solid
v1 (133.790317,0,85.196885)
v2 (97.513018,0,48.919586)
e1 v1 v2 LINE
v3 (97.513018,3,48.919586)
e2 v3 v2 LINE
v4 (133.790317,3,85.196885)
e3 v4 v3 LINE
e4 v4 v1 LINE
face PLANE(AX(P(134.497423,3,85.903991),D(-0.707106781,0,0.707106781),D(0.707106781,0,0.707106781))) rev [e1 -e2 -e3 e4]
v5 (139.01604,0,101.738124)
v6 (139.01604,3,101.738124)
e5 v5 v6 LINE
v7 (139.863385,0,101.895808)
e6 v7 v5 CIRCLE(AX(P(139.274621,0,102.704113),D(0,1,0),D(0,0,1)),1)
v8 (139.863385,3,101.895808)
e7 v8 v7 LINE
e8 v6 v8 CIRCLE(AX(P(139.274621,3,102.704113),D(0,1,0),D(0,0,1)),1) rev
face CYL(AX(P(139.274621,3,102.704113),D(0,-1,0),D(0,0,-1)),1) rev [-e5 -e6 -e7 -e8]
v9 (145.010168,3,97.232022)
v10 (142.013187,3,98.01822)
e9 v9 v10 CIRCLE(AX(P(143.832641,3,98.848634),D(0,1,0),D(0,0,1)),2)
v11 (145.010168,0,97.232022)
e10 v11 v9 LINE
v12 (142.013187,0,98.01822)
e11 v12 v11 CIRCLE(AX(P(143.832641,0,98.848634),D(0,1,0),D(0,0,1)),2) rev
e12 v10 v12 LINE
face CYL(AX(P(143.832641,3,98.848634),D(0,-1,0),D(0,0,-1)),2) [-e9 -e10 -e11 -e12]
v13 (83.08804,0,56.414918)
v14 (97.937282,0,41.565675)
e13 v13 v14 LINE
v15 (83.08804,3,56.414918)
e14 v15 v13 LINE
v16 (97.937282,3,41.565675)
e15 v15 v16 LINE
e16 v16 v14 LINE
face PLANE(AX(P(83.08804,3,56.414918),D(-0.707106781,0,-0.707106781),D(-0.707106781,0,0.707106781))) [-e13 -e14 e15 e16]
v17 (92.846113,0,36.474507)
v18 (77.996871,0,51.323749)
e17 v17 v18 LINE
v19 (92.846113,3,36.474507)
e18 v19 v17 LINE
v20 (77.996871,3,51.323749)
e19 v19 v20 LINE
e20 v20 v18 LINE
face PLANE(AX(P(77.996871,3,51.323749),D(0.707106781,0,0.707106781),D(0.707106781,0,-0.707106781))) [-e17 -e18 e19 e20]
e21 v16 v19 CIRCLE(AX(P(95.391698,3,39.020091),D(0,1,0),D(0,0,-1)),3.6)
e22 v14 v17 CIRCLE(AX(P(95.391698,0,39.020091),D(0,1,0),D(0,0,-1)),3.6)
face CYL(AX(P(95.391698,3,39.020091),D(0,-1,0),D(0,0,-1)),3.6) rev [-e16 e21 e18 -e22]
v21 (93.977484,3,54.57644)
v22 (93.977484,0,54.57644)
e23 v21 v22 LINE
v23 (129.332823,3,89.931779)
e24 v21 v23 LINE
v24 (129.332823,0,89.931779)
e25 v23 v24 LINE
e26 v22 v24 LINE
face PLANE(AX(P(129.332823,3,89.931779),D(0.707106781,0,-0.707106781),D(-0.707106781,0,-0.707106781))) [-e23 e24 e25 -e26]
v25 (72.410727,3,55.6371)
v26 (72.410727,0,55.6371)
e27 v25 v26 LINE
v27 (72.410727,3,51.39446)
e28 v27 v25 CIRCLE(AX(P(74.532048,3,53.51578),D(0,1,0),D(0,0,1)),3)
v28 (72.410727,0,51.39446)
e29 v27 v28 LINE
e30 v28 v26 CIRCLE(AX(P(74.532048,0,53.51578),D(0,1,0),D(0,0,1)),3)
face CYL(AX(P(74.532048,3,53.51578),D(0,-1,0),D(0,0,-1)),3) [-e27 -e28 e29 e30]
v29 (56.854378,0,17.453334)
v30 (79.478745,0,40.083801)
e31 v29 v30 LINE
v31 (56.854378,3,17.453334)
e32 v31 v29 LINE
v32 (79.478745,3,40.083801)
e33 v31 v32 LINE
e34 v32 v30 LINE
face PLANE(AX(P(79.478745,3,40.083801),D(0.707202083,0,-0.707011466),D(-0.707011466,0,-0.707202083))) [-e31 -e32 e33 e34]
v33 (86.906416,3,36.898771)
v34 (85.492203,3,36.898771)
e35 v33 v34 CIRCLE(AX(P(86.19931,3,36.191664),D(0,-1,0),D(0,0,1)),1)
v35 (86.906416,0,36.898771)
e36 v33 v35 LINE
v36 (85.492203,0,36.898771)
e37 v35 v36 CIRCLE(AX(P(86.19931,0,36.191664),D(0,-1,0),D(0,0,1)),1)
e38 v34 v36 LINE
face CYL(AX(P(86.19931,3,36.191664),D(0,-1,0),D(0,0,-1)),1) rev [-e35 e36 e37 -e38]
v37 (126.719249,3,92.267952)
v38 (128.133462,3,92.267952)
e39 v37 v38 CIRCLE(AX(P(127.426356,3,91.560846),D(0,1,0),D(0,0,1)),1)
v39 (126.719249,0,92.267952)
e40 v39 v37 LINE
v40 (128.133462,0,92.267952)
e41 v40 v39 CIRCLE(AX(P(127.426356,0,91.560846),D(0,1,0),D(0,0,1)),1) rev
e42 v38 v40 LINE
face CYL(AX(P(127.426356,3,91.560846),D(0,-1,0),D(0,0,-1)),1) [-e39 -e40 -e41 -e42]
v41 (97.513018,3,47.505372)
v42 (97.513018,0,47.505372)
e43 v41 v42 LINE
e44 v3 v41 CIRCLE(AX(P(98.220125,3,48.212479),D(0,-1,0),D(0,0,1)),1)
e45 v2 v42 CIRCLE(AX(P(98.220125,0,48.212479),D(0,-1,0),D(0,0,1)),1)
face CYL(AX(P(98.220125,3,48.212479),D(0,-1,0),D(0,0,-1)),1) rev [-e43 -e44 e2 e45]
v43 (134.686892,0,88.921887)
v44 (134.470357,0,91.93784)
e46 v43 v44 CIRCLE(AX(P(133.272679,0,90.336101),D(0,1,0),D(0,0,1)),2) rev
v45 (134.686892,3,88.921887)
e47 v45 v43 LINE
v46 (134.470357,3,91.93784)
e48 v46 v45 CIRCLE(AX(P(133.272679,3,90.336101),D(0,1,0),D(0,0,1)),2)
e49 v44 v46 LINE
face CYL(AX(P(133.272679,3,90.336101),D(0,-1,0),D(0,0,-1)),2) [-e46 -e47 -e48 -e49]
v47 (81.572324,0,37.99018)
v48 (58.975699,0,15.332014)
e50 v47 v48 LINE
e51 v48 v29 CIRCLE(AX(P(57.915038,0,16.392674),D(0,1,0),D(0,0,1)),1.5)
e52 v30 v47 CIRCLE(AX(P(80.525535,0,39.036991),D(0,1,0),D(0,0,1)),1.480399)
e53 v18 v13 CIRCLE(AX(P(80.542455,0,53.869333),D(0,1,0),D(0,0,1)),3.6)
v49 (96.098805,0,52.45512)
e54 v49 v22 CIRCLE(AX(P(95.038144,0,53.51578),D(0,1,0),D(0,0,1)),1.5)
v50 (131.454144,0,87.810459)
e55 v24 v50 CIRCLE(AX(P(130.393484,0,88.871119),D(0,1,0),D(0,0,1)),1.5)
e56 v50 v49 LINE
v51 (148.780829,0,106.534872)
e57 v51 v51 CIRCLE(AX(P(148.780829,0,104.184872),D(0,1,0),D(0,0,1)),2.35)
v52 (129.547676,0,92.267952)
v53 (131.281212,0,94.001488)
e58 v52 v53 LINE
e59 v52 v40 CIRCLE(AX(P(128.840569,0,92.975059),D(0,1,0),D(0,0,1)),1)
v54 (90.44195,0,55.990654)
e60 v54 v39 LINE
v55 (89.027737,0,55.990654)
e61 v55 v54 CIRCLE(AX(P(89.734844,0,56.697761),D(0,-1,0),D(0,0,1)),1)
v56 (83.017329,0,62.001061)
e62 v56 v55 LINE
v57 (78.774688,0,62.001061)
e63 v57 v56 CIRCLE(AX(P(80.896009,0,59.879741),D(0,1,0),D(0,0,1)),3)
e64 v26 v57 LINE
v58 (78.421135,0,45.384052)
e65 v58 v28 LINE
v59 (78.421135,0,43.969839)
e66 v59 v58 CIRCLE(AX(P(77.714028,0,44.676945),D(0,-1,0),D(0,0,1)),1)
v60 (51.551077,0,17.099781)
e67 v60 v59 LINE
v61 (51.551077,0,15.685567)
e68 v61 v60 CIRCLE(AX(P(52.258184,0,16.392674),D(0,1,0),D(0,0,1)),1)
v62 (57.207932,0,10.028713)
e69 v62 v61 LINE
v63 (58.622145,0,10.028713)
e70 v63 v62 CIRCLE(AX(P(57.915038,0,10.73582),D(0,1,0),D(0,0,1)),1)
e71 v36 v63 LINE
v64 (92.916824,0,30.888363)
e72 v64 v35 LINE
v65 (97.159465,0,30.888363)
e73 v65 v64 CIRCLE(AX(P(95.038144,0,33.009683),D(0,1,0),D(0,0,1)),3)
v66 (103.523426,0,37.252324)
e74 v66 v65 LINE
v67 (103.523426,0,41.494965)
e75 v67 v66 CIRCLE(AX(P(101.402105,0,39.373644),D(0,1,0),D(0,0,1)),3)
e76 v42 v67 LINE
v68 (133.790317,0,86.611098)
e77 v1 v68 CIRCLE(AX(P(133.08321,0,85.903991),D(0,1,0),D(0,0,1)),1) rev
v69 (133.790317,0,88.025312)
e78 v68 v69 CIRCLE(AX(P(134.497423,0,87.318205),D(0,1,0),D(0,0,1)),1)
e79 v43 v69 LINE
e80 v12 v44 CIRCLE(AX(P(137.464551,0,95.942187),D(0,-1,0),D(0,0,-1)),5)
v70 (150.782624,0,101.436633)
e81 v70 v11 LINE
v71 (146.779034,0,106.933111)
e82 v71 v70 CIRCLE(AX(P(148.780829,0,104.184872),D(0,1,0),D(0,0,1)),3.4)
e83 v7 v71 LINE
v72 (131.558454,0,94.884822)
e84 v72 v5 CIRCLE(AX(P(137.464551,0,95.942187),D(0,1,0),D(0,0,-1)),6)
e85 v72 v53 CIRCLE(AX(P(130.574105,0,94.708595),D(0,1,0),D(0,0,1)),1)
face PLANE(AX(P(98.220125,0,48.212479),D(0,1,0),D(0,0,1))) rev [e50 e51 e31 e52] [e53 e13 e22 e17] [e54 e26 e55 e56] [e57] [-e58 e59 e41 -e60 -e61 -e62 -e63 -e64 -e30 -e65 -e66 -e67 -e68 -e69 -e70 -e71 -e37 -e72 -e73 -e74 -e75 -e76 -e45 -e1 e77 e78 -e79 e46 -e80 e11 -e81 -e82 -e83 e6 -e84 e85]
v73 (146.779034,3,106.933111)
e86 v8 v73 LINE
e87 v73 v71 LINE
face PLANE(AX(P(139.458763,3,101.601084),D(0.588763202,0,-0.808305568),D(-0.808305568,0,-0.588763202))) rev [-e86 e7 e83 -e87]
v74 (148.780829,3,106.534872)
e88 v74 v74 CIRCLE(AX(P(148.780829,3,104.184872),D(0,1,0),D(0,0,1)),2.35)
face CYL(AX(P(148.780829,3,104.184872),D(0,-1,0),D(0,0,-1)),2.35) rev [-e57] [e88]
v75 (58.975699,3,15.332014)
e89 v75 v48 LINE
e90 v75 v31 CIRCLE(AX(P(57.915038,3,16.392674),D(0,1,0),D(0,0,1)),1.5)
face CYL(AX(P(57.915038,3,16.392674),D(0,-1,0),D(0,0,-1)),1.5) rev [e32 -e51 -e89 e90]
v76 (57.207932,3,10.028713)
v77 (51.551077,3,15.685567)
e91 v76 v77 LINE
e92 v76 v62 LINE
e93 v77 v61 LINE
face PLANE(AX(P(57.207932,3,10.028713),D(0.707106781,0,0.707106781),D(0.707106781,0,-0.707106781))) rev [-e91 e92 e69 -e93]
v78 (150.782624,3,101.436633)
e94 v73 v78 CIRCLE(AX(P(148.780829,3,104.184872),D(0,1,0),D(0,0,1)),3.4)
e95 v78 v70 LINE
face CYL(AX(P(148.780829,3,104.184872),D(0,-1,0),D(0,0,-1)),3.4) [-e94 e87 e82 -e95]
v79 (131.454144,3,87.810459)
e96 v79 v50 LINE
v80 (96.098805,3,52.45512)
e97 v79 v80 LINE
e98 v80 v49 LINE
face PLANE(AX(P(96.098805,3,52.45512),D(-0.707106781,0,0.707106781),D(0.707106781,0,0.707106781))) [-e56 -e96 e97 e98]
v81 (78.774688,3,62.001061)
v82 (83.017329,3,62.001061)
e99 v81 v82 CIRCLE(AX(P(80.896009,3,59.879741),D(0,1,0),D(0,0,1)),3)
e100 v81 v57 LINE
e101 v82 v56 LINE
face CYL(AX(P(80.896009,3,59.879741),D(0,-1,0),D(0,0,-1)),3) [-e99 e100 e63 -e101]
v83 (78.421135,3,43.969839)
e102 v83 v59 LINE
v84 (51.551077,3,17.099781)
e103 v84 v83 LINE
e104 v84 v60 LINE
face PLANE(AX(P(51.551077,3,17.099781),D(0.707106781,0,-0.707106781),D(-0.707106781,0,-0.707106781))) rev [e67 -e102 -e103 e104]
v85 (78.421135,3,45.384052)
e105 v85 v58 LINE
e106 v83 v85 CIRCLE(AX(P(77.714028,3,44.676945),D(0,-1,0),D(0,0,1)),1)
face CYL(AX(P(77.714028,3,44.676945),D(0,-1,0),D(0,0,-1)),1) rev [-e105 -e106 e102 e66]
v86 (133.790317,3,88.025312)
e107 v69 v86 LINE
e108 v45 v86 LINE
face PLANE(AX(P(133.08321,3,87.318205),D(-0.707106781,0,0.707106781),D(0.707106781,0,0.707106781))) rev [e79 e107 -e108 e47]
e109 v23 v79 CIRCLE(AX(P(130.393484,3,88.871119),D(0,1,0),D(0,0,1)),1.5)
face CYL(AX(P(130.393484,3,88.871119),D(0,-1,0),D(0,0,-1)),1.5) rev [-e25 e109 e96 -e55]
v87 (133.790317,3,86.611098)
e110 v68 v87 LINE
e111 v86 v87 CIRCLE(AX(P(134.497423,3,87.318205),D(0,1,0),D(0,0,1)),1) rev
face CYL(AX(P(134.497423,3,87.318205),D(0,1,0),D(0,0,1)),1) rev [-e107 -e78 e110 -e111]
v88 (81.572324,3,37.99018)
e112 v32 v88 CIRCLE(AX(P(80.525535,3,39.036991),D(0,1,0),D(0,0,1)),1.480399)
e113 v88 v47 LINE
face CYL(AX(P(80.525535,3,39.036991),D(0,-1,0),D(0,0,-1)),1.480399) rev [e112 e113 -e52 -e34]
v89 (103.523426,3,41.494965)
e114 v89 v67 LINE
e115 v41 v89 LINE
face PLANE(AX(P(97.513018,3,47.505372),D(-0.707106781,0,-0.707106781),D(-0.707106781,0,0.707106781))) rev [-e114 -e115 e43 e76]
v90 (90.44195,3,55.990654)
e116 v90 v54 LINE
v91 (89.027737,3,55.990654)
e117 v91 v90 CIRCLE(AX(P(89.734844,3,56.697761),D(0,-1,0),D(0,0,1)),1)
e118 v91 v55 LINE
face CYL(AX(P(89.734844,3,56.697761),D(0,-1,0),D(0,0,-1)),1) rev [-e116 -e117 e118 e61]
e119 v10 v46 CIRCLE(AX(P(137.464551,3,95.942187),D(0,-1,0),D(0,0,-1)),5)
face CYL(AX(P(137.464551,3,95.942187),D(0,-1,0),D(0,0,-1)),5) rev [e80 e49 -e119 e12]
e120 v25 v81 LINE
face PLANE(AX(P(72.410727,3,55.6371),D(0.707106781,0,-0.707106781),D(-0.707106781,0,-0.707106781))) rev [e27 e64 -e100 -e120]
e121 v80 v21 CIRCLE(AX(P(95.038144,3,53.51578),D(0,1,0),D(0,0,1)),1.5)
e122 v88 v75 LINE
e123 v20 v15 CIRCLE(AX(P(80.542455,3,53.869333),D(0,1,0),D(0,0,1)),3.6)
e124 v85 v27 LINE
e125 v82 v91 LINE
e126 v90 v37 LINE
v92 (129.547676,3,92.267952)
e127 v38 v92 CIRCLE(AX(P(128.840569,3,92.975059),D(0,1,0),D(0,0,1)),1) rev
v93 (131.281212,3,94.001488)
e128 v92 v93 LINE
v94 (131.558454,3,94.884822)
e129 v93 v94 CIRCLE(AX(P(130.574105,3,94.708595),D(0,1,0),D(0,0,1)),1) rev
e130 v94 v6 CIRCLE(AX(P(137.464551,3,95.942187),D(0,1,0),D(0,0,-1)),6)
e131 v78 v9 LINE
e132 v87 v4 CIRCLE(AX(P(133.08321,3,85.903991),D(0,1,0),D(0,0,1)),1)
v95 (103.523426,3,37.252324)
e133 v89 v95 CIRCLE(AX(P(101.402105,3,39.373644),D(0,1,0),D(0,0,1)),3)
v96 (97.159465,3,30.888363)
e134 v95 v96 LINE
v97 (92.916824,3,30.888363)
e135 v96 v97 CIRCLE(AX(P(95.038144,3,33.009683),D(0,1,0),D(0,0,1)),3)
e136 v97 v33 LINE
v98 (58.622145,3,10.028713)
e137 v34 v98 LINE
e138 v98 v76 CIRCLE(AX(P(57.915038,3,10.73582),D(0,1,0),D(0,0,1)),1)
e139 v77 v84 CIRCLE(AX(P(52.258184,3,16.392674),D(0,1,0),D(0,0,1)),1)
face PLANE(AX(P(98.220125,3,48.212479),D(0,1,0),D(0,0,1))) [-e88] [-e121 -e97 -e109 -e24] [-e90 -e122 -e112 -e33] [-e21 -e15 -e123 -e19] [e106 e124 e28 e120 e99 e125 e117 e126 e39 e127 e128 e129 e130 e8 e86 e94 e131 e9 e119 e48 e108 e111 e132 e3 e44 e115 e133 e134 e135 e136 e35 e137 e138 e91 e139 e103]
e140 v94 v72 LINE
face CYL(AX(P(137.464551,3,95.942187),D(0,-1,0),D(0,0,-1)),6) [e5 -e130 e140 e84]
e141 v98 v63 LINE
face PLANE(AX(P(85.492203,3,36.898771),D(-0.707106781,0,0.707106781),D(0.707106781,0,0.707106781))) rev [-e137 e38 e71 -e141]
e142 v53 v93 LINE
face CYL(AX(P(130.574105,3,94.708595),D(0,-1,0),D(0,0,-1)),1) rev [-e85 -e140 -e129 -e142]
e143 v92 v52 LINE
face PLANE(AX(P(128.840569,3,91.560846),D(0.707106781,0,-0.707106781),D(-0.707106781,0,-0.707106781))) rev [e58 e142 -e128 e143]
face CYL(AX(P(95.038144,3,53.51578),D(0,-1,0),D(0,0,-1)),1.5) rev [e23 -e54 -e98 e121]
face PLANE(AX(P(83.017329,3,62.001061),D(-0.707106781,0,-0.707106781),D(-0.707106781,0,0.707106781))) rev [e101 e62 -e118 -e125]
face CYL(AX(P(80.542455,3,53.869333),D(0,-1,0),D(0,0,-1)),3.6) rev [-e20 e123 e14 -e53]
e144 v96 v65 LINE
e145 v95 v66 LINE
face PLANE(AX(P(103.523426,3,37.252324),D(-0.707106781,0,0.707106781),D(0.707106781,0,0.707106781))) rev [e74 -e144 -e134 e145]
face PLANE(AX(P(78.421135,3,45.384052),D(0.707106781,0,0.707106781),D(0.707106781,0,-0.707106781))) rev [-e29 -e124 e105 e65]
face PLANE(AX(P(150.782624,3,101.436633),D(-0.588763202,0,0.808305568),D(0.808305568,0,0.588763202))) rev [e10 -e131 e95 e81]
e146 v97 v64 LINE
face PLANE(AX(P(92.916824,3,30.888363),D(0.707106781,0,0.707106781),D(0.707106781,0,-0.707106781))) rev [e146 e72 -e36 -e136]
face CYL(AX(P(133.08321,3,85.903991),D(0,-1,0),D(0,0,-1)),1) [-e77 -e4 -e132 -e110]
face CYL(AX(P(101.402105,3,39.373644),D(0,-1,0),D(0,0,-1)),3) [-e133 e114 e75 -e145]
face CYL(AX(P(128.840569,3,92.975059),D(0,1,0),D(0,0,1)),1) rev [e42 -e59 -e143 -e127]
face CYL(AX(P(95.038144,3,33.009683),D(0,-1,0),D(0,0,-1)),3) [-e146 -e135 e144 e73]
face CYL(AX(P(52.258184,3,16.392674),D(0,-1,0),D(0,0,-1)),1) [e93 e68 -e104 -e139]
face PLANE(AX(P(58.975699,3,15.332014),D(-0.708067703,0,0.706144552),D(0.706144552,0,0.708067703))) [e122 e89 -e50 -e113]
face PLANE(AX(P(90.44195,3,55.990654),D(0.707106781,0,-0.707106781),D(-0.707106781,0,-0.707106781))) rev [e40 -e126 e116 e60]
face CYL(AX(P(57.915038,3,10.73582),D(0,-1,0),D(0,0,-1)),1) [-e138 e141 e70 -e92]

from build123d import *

# Parameters (mm, degrees)
SKETCH1_R           = 2.35
BOSS_EXTRUDE1_DEPTH = 3
FILLET1_R           = 1
FILLET2_R           = 2


with BuildPart() as part:
    # Sketch1 → Boss-Extrude1 (new body)
    with BuildSketch(Plane(origin=(0, 0, 0), x_dir=(1, 0, 0), z_dir=(0, 1, 0))):
        with BuildLine():
            Line((150.782624159, -101.436632834), (142.429643363, -95.352389557))
            ThreePointArc((142.429643363, -95.352389557), (134.417437791, -99.906414375), (136.757444533, -90.99243947))
            Line((136.757444533, -90.99243947), (133.083209919, -87.318204856))
            Line((133.083209919, -87.318204856), (134.497423481, -85.903991293))
            Line((134.497423481, -85.903991293), (97.513018177, -48.919585989))
            ThreePointArc((97.513018177, -48.919585989), (97.220124958, -48.212479208), (97.513018177, -47.505372427))
            Line((97.513018177, -47.505372427), (103.523425817, -41.494964787))
            ThreePointArc((103.523425817, -41.494964787), (104.402105474, -39.373644443), (103.523425817, -37.2523241))
            Line((103.523425817, -37.2523241), (97.159464787, -30.888363069))
            ThreePointArc((97.159464787, -30.888363069), (95.038144443, -30.009683412), (92.9168241, -30.888363069))
            Line((92.9168241, -30.888363069), (86.906416459, -36.898770709))
            ThreePointArc((86.906416459, -36.898770709), (86.199309678, -37.191663928), (85.492202897, -36.898770709))
            Line((85.492202897, -36.898770709), (58.622145212, -10.028713024))
            ThreePointArc((58.622145212, -10.028713024), (57.915038431, -9.735819805), (57.20793165, -10.028713024))
            Line((57.20793165, -10.028713024), (51.5510774, -15.685567273))
            ThreePointArc((51.5510774, -15.685567273), (51.258184181, -16.392674055), (51.5510774, -17.099780836))
            Line((51.5510774, -17.099780836), (78.421135085, -43.969838521))
            ThreePointArc((78.421135085, -43.969838521), (78.714028304, -44.676945302), (78.421135085, -45.384052083))
            Line((78.421135085, -45.384052083), (72.410727445, -51.394459723))
            ThreePointArc((72.410727445, -51.394459723), (71.532047789, -53.515780067), (72.410727445, -55.63710041))
            Line((72.410727445, -55.63710041), (78.774688476, -62.001061441))
            ThreePointArc((78.774688476, -62.001061441), (80.896008819, -62.879741098), (83.017329163, -62.001061441))
            Line((83.017329163, -62.001061441), (89.027736803, -55.990653801))
            ThreePointArc((89.027736803, -55.990653801), (89.734843584, -55.697760582), (90.441950365, -55.990653801))
            Line((90.441950365, -55.990653801), (127.426355669, -92.975059105))
            Line((127.426355669, -92.975059105), (128.840569232, -91.560845543))
            Line((128.840569232, -91.560845543), (131.668996357, -94.389272667))
            ThreePointArc((131.668996357, -94.389272667), (133.388387651, -100.345014415), (139.458762793, -101.601084408))
            Line((139.458762793, -101.601084408), (146.779034385, -106.933110699))
            ThreePointArc((146.779034385, -106.933110699), (151.529068204, -106.186666654), (150.782624159, -101.436632834))
        make_face()
        with Locations(Location((148.780829272, -104.184871767, 0), (0, 0, 270))):
            Circle(SKETCH1_R, mode=Mode.SUBTRACT)
        with BuildLine():
            Line((77.996871016, -51.323749045), (92.846113421, -36.47450664))
            ThreePointArc((92.846113421, -36.47450664), (97.937282246, -36.47450664), (97.937282246, -41.565675465))
            Line((97.937282246, -41.565675465), (83.088039841, -56.41491787))
            ThreePointArc((83.088039841, -56.41491787), (77.996871016, -56.41491787), (77.996871016, -51.323749045))
        make_face(mode=Mode.SUBTRACT)
        with BuildLine():
            Line((96.098804615, -52.455119895), (131.454143674, -87.810458954))
            ThreePointArc((131.454143674, -87.810458954), (131.454143674, -89.931779298), (129.332823331, -89.931779298))
            Line((129.332823331, -89.931779298), (93.977484271, -54.576440239))
            ThreePointArc((93.977484271, -54.576440239), (93.977484271, -52.455119895), (96.098804615, -52.455119895))
        make_face(mode=Mode.SUBTRACT)
        with BuildLine():
            Line((58.975698603, -15.332013883), (81.572324274, -37.990180363))
            ThreePointArc((81.572324274, -37.990180363), (81.572344991, -40.083780173), (79.478745181, -40.08380089))
            Line((79.478745181, -40.08380089), (56.854378259, -17.453334226))
            ThreePointArc((56.854378259, -17.453334226), (56.854378259, -15.332013883), (58.975698603, -15.332013883))
        make_face(mode=Mode.SUBTRACT)
    extrude(amount=BOSS_EXTRUDE1_DEPTH)

    # Fillet1
    fillet1_edges = [part.edges().sort_by_distance(p)[0] for p in [
        (139.458762793, 1.5, 101.601084408),
        (131.668996357, 1.5, 94.389272667),
        (133.083209919, 1.5, 87.318204856),
        (134.497423481, 1.5, 85.903991293),
        (128.840569232, 1.5, 91.560845543),
        (127.426355669, 1.5, 92.975059105),
    ]]
    fillet(fillet1_edges, radius=FILLET1_R - 0.0001)  # a hair under: the kernel refuses the full size

    # Fillet2
    fillet2_edges = [part.edges().sort_by_distance(p)[0] for p in [
        (136.757444533, 1.5, 90.99243947),
        (142.429643363, 1.5, 95.352389557),
    ]]
    fillet(fillet2_edges, radius=FILLET2_R)


solid = part.part
